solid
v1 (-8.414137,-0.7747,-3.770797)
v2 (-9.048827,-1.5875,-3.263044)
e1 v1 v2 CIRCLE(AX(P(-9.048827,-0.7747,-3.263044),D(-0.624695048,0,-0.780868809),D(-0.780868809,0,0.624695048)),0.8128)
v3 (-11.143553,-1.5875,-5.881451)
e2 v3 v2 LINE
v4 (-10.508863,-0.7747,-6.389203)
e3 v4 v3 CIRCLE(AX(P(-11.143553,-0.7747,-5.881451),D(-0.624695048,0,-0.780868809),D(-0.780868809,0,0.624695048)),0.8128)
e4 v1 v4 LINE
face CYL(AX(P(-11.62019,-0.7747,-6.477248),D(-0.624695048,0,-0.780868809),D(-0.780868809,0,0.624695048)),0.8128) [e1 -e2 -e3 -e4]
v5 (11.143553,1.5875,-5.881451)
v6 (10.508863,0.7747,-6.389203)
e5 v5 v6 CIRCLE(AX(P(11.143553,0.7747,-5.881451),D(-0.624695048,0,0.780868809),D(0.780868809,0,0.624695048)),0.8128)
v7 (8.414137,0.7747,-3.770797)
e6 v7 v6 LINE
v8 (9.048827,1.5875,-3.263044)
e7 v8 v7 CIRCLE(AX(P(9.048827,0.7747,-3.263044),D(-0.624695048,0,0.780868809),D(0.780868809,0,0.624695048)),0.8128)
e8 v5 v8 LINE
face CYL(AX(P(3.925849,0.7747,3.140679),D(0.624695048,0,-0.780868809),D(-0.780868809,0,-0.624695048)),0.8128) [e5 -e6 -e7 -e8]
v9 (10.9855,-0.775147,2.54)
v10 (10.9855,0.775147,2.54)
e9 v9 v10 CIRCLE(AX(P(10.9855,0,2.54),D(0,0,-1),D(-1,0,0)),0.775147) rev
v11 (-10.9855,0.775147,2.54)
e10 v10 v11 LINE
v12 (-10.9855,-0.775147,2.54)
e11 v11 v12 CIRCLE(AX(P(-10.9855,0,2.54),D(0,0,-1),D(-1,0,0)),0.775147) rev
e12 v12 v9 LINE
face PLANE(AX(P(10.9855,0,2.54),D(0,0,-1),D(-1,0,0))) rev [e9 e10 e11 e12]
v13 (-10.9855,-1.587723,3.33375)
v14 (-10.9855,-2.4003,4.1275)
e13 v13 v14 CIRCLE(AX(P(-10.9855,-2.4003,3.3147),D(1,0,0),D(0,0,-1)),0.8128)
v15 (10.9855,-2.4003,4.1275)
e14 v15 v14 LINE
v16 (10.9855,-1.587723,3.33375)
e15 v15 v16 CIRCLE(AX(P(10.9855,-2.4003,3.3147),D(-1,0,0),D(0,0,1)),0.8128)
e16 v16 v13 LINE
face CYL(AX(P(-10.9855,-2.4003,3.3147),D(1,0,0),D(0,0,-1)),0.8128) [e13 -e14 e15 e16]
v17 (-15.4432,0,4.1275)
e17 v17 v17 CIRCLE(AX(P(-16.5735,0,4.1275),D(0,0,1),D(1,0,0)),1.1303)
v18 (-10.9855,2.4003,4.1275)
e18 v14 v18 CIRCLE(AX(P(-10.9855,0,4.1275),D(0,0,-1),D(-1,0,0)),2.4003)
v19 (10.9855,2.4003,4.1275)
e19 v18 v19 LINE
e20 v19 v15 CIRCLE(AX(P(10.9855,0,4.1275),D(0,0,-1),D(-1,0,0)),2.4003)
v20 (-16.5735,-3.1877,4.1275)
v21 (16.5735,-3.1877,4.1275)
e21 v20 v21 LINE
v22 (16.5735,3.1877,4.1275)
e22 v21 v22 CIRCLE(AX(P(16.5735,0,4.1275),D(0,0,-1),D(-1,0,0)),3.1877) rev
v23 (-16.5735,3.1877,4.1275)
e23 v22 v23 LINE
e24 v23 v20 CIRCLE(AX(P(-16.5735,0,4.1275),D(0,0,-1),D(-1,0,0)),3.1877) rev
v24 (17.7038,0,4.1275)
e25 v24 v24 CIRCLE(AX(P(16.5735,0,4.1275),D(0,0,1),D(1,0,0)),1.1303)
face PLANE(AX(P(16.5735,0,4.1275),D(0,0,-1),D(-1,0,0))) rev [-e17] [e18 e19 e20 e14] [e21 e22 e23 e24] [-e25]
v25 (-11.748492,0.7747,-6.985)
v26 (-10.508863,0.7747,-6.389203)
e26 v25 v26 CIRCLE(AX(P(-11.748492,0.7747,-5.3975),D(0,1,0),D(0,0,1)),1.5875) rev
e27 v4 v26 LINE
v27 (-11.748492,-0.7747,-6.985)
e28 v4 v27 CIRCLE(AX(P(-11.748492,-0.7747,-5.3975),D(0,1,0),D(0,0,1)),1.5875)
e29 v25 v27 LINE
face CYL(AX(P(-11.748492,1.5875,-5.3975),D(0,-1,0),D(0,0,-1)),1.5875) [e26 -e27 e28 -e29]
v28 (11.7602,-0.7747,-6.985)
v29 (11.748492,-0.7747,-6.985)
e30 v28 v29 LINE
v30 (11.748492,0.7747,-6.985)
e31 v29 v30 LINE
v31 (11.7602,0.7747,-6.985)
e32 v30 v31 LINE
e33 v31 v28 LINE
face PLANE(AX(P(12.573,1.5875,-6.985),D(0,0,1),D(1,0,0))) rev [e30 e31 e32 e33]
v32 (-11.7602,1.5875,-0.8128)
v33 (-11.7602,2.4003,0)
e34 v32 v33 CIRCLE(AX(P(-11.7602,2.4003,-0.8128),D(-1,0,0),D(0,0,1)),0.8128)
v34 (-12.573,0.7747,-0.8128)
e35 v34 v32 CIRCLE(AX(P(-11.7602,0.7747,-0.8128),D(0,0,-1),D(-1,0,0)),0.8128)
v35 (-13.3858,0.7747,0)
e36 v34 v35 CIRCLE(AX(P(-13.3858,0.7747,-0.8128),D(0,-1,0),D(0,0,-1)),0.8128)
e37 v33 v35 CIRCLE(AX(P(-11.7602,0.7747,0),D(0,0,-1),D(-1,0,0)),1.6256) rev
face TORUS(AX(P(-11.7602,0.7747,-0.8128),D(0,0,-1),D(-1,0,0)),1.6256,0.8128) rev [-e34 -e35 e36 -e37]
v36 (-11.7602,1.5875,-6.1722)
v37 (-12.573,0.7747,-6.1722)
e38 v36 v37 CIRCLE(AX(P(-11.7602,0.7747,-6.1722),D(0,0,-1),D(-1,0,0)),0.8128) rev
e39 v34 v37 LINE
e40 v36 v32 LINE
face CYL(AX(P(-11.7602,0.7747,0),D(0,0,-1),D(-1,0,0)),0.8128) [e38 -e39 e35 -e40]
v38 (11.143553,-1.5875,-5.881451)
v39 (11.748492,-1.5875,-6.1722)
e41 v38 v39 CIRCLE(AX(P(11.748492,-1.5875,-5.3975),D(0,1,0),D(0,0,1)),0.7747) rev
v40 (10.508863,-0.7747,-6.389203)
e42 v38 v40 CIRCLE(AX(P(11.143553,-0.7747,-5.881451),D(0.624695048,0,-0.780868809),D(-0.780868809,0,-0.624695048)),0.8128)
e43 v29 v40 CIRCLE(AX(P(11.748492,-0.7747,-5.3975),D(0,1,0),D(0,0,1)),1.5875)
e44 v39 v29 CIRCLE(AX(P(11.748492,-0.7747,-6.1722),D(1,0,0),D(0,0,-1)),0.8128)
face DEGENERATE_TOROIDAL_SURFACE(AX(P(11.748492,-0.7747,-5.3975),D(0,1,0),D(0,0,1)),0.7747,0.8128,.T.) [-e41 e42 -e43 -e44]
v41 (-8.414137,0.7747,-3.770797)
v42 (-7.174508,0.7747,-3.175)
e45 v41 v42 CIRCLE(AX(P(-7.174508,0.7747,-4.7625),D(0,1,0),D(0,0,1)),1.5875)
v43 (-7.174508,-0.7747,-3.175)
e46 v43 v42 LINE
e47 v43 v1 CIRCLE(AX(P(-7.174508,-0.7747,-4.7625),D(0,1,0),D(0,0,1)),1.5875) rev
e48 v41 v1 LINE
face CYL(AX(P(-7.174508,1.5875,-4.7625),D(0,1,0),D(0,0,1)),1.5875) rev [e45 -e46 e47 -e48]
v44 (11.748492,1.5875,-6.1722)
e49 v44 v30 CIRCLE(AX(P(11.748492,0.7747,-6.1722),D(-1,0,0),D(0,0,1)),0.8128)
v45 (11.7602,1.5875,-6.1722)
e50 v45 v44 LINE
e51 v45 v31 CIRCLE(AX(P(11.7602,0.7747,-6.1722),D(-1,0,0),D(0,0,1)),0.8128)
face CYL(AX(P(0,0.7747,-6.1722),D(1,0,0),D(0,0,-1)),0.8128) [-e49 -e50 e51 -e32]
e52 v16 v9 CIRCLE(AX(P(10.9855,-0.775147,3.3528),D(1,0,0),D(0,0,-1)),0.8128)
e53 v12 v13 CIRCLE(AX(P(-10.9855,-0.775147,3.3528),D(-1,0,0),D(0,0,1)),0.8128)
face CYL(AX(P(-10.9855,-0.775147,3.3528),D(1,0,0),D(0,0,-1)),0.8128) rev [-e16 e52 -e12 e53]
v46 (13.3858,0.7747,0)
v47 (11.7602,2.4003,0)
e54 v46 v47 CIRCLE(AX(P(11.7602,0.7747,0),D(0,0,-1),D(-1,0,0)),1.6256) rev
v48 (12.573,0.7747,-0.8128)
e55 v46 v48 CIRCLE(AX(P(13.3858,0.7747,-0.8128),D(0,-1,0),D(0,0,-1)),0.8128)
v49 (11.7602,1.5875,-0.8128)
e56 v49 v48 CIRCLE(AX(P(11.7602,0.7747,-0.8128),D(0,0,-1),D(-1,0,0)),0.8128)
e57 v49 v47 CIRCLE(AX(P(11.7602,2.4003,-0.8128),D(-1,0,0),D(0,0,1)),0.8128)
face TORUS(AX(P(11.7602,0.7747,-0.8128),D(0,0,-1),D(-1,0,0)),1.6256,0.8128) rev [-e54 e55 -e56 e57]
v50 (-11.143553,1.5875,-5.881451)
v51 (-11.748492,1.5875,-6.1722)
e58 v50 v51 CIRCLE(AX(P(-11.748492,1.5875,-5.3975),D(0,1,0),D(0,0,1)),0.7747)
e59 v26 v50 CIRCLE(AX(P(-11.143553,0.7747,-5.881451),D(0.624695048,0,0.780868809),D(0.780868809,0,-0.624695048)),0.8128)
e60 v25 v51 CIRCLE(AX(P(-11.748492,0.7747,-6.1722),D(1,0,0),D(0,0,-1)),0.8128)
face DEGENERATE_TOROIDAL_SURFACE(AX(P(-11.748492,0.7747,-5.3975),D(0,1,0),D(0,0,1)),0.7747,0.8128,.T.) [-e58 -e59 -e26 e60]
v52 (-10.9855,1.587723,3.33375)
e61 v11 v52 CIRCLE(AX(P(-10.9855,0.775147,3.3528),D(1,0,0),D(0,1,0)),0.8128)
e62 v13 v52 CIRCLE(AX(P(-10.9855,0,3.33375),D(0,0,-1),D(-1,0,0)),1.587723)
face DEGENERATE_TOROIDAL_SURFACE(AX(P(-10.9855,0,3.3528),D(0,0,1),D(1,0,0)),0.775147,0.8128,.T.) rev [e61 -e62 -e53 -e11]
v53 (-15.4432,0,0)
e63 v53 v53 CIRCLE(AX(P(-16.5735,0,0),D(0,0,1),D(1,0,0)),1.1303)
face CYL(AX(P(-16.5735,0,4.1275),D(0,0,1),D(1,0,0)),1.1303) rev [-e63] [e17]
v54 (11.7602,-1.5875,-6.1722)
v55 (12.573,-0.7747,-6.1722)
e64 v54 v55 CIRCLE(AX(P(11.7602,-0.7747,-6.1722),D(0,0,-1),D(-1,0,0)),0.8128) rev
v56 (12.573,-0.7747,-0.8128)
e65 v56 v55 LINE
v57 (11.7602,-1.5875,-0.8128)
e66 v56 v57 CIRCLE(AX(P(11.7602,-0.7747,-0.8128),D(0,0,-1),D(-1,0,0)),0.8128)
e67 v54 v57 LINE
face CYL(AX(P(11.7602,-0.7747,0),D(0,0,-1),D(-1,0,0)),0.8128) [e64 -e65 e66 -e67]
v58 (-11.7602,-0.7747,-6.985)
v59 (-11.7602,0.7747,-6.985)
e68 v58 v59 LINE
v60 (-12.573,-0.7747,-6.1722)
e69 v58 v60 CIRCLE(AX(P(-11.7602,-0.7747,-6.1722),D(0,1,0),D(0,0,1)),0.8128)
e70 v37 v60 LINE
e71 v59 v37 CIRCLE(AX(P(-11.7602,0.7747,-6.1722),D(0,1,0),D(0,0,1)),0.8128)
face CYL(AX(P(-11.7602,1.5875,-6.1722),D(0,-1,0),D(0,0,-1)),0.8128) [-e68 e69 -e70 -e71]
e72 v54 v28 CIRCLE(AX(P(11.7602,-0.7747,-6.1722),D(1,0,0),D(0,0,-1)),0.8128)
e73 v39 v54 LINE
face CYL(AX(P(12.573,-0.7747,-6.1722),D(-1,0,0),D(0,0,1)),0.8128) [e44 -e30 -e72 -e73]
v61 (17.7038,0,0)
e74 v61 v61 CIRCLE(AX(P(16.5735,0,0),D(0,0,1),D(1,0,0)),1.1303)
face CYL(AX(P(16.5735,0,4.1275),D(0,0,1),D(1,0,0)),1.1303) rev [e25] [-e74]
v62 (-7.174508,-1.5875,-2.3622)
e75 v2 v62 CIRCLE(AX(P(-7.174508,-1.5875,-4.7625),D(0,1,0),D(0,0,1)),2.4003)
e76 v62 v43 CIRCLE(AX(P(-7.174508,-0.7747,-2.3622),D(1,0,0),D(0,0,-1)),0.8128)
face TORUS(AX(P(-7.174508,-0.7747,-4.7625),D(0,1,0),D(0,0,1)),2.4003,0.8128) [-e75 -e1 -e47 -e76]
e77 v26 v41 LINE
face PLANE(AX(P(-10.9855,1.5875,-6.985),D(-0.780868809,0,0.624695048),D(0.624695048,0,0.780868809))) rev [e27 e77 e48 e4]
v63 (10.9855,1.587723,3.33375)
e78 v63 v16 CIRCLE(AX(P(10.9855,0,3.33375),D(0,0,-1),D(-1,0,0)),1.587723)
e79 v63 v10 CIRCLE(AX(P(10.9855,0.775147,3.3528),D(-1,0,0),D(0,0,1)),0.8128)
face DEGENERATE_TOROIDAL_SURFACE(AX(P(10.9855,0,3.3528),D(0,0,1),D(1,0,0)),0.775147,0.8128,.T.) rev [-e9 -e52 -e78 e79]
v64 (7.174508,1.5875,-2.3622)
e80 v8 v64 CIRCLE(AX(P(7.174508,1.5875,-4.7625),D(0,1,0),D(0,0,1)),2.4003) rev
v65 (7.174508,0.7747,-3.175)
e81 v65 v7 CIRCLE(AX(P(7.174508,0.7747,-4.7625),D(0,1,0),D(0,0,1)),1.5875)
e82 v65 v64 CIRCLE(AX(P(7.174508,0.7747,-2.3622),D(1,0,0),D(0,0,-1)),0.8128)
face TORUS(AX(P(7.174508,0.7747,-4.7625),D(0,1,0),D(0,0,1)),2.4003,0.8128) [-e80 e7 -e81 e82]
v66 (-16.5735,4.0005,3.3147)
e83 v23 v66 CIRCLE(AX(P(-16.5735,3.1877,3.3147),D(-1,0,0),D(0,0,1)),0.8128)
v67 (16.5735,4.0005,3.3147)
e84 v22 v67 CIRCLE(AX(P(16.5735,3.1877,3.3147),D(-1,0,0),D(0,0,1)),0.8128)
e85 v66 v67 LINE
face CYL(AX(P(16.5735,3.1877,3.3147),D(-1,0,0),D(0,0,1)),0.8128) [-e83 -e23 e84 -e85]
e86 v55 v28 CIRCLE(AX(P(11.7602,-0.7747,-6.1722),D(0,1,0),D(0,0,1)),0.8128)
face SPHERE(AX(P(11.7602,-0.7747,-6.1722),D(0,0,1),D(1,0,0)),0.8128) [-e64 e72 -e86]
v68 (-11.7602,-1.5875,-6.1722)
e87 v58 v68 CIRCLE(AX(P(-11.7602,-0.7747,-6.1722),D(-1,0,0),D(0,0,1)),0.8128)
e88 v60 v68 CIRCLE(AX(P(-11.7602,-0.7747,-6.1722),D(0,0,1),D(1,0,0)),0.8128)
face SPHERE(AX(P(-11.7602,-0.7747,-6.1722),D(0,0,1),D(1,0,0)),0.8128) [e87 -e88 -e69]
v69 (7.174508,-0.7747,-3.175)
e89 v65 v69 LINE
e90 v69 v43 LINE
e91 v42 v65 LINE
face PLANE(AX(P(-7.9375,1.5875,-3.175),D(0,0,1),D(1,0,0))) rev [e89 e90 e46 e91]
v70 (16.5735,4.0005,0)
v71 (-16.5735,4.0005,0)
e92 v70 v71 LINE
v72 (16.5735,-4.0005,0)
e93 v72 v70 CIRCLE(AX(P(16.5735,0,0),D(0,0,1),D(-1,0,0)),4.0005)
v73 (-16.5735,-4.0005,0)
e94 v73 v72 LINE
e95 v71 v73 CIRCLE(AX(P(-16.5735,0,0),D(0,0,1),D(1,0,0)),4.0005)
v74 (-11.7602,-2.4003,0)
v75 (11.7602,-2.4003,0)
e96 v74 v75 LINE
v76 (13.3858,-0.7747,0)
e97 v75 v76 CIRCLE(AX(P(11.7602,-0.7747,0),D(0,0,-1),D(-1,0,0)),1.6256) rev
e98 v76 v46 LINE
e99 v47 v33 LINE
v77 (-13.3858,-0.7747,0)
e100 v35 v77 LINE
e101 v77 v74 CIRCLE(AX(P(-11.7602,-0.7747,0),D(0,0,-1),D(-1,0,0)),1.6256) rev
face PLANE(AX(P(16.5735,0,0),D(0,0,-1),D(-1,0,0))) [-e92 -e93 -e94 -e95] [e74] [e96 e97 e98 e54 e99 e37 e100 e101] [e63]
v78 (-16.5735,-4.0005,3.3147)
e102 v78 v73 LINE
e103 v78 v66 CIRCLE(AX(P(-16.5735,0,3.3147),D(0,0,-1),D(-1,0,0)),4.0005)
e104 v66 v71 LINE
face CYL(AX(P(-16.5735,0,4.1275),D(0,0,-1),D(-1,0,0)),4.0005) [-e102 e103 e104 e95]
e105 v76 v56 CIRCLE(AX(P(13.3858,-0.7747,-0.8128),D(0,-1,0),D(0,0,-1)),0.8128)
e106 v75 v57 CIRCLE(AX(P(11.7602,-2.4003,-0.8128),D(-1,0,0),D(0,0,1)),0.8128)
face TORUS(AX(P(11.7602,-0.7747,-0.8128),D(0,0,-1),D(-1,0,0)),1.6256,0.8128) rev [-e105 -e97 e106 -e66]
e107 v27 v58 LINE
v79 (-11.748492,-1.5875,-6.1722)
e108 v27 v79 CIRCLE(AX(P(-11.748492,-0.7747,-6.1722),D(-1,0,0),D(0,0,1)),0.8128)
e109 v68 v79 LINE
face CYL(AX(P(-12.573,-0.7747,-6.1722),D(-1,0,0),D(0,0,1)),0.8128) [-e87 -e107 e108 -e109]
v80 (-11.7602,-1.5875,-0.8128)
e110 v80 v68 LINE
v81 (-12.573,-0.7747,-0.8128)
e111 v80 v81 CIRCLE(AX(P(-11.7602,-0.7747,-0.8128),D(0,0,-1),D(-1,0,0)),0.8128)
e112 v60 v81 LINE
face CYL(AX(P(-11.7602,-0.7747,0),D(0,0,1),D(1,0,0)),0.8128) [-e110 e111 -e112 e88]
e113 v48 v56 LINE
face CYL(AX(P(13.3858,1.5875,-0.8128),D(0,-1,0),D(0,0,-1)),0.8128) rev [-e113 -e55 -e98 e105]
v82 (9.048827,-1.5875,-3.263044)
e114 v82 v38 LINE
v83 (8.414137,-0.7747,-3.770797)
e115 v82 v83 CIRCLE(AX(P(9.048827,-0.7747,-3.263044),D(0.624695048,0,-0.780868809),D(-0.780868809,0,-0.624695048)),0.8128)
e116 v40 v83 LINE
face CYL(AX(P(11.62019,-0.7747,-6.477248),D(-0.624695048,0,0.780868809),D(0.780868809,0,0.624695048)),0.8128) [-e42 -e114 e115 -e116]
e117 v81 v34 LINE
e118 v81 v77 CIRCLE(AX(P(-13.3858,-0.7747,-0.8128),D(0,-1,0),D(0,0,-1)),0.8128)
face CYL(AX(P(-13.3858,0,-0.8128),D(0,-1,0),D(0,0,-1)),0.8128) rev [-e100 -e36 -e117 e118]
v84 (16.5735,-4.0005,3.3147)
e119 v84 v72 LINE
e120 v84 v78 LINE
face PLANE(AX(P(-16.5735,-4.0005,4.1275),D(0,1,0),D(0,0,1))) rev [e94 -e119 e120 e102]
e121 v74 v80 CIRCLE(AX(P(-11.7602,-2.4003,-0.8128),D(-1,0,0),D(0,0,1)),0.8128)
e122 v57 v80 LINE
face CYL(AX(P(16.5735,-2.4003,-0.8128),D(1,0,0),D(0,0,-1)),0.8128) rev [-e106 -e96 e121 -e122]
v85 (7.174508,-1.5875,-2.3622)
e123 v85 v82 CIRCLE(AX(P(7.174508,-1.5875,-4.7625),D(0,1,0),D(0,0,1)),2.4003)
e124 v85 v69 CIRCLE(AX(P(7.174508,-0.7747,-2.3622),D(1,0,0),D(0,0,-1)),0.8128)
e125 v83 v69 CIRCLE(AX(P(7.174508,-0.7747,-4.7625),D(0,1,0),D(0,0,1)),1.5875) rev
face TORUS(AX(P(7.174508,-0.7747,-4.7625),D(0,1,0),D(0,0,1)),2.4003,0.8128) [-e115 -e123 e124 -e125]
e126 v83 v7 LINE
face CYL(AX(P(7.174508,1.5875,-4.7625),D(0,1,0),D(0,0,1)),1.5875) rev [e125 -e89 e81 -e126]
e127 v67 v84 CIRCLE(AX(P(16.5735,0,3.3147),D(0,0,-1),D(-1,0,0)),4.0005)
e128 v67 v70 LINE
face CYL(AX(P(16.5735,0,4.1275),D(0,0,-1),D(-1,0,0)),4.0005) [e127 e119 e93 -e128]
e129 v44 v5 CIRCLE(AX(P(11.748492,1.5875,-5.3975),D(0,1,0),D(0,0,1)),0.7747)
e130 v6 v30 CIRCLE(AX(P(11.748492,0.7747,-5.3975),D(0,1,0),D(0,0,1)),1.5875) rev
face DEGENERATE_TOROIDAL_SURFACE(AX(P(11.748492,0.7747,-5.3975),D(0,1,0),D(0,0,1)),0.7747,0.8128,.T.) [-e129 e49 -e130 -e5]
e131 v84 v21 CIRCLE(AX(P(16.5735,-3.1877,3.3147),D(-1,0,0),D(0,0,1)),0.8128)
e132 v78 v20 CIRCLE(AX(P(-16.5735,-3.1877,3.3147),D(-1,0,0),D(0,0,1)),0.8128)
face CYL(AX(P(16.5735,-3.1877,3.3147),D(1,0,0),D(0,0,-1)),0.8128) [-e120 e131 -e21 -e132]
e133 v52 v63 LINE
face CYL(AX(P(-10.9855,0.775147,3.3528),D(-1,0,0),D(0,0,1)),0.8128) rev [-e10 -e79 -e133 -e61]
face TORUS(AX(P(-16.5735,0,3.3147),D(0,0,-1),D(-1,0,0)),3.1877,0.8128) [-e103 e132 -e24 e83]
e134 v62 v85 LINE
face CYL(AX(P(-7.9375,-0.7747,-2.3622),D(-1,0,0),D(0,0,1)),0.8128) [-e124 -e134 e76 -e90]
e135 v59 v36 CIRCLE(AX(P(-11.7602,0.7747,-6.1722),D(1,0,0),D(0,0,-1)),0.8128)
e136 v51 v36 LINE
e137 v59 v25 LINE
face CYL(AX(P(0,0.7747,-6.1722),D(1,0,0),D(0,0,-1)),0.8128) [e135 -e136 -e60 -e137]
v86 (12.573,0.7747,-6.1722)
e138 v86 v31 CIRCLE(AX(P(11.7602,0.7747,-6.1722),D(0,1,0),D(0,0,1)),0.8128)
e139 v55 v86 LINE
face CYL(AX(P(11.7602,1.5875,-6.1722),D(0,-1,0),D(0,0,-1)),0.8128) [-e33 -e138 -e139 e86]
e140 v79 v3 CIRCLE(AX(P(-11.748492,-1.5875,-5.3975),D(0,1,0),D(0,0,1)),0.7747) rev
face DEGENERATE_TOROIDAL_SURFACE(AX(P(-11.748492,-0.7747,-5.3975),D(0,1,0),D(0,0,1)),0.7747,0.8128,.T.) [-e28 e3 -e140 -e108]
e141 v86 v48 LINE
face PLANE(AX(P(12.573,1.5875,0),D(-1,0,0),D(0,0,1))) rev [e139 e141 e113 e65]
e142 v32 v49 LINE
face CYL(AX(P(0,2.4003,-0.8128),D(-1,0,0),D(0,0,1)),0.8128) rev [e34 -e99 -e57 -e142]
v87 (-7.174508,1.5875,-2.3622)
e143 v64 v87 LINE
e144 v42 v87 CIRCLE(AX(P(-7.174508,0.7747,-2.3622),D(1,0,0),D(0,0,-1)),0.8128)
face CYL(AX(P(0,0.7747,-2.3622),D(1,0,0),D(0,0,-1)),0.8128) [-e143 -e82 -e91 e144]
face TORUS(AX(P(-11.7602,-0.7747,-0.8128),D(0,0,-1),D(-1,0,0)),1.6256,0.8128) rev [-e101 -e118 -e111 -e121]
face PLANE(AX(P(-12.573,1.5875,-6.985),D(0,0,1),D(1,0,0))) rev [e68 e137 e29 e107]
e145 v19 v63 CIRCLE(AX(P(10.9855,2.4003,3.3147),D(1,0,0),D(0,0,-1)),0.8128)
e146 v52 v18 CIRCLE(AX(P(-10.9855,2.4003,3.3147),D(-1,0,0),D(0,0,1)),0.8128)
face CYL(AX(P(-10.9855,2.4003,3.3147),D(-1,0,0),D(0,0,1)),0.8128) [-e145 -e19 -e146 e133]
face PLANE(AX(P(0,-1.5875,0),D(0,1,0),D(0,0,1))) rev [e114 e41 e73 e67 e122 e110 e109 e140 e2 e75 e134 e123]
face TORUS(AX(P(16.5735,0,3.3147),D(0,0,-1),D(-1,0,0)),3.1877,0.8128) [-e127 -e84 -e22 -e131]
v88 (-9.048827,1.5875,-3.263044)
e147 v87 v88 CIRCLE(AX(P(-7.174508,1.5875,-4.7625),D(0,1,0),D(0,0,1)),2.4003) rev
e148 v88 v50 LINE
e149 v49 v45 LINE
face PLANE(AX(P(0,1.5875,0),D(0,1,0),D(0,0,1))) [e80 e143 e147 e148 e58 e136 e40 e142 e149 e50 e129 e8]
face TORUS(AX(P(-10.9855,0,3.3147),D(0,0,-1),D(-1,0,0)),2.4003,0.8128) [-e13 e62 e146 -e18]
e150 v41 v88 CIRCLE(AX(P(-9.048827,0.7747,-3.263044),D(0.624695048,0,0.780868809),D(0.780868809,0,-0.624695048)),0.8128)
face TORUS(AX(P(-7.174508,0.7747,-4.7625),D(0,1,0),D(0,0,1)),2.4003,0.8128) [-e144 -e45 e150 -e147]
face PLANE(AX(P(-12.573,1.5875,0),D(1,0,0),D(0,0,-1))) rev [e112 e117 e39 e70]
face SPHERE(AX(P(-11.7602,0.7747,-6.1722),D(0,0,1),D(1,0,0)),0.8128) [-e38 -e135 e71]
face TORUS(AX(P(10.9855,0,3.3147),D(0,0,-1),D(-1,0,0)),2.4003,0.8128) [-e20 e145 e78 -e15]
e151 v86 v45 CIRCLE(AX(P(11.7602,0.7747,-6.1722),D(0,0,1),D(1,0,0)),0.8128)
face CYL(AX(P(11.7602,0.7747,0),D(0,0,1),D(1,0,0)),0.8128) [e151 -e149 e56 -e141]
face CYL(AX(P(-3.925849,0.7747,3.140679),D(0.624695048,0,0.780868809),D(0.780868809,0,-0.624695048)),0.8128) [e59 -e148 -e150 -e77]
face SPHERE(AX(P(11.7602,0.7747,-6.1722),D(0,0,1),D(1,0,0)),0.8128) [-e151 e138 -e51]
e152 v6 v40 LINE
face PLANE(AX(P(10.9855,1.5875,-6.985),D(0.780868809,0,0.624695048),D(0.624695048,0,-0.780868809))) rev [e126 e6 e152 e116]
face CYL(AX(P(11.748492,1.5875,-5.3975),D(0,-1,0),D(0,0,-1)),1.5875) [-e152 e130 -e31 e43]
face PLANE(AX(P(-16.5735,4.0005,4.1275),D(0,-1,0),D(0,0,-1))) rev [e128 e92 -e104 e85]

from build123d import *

# Parameters (mm, degrees)
BOSS_EXTRUDE1_DEPTH   = 4.1275
CUT_EXTRUDE1_DEPTH    = 1.5875
F_4_40_TAPPED_HOLE1_D = 2.2606
BOSS_EXTRUDE2_DEPTH   = 1.5875
FILLET1_R             = 1.5875
FILLET2_R             = 0.8128
FILLET3_R             = 0.8128
FILLET4_R             = 0.8128


with BuildPart() as part:
    # Sketch1 → Boss-Extrude1 (new body)
    with BuildSketch(Plane.XY):
        with BuildLine():
            Line((-16.5735, 4.0005), (16.5735, 4.0005))
            ThreePointArc((16.5735, 4.0005), (20.574, 0), (16.5735, -4.0005))
            Line((16.5735, -4.0005), (-16.5735, -4.0005))
            ThreePointArc((-16.5735, -4.0005), (-20.574, 0), (-16.5735, 4.0005))
        make_face()
    extrude(amount=BOSS_EXTRUDE1_DEPTH)

    # Sketch2 → Cut-Extrude1 (cut)
    with BuildSketch(Plane.XY.offset(4.1275)):
        with BuildLine():
            Line((-10.9855, 1.5875), (10.9855, 1.5875))
            ThreePointArc((10.9855, 1.5875), (12.573, 0), (10.9855, -1.5875))
            Line((10.9855, -1.5875), (-10.9855, -1.5875))
            ThreePointArc((-10.9855, -1.5875), (-12.573, 0), (-10.9855, 1.5875))
        make_face()
    extrude(amount=-CUT_EXTRUDE1_DEPTH, mode=Mode.SUBTRACT)

    # #4-40 Tapped Hole1 (through all)
    with Locations(Plane.XY.offset(4.1275)):
        with Locations((-16.5735, 0), (16.5735, 0)):
            Hole(F_4_40_TAPPED_HOLE1_D / 2)

    # Sketch5 → Boss-Extrude2 (add, symmetric)
    with BuildSketch(Plane(origin=(0, 0, 0), x_dir=(1, 0, 0), z_dir=(0, 1, 0))):
        Polygon((-12.573, 0), (-12.573, 6.985), (-10.9855, 6.985), (-7.9375, 3.175), (7.9375, 3.175), (10.9855, 6.985), (12.573, 6.985), (12.573, 0), align=None)
    extrude(amount=BOSS_EXTRUDE2_DEPTH, both=True)

    # Fillet1
    fillet1_edges = [part.edges().sort_by_distance(p)[0] for p in [
        (10.9855, 0, -6.985),
        (7.9375, 0, -3.175),
        (-7.9375, 0, -3.175),
        (-10.9855, 0, -6.985),
    ]]
    fillet(fillet1_edges, radius=FILLET1_R)

    # Fillet2
    fillet2_edges = [part.edges().sort_by_distance(p)[0] for p in [
        (12.573, -1.5875, -3.4925),
        (-12.573, -1.5875, -3.4925),
        (12.573, 1.5875, -3.4925),
        (-12.573, 1.5875, -3.4925),
    ]]
    fillet(fillet2_edges, radius=FILLET2_R)

    # Fillet3
    fillet3_edges = [part.edges().sort_by_distance(p)[0] for p in [
        (12.573, 0, 0),
        (11.754345973, -1.5875, -6.985),
        (11.754345973, 1.5875, -6.985),
        (12.334936392, 1.349436392, -6.985),
        (12.334936392, -1.349436392, -6.985),
        (0, -1.5875, 0),
        (0, 1.5875, 0),
        (-12.573, 0, 0),
        (-12.573, 0, -6.985),
        (-12.334936392, 1.349436392, -6.985),
        (-12.334936392, -1.349436392, -6.985),
        (12.334936392, -1.349436392, 0),
        (12.334936392, 1.349436392, 0),
        (-12.334936392, -1.349436392, 0),
        (-12.334936392, 1.349436392, 0),
        (-20.574, 0, 4.1275),
        (0, -4.0005, 4.1275),
        (12.573, 0, 4.1275),
        (0, 1.5875, 4.1275),
        (-12.573, 0, 4.1275),
        (0, -1.5875, 4.1275),
        (20.574, 0, 4.1275),
        (-11.754345973, -1.5875, -6.985),
        (-11.754345973, 1.5875, -6.985),
        (-9.4615, -1.5875, -5.08),
        (0, -1.5875, -3.175),
        (9.4615, -1.5875, -5.08),
        (11.060804836, -1.5875, -6.828318888),
        (-11.060804836, -1.5875, -6.828318888),
        (-9.4615, 1.5875, -5.08),
        (9.4615, 1.5875, -5.08),
        (0, 1.5875, -3.175),
        (11.060804836, 1.5875, -6.828318888),
        (-11.060804836, 1.5875, -6.828318888),
        (7.862195164, -1.5875, -3.331681112),
        (7.862195164, 1.5875, -3.331681112),
        (-7.862195164, -1.5875, -3.331681112),
        (-7.862195164, 1.5875, -3.331681112),
        (0, 4.0005, 4.1275),
        (12.573, 0, -6.985),
    ]]
    fillet(fillet3_edges, radius=FILLET3_R)

    # Fillet4
    # the kernel refuses this fillet: 0.8128 mm, written as the material it adds along each edge
    with BuildSketch(Plane(origin=(10.9855, -1.5875, 2.54), x_dir=(0, -0.00028128862329323027, 0.9999999604383545), z_dir=(-1, 0, 0)), Plane(origin=(-10.9855, 1.5875, 2.54), x_dir=(0, 0.00028128862329323027, 0.9999999604383545), z_dir=(1, 0, 0))) as fillet4_piece_1:
        with BuildLine():
            CenterArc((0.812571462, 0.812582054), FILLET4_R, 180.016116651, 88.657007194)
            Line((-0.000228506, 0.812353422), (-0.081508503, 0.812330559))
            Line((-0.081508503, 0.812330559), (-0.081279997, -2.2863e-05))
            Line((-0.081279997, -2.2863e-05), (2.2863e-05, -0.081279997))
            ThreePointArc((2.2863e-05, -0.081279997), (0.774722832, -0.081062082), (0.791867888, -0.081258205))
            Line((0.791867888, -0.081258205), (0.793750031, 0))
        make_face()
    extrude(amount=21.971)
    with BuildSketch(Plane(origin=(-10.9855, 0, 2.54), x_dir=(0, -1, 0), z_dir=(1, 0, 0))) as fillet4_piece_2:
        with BuildLine():
            CenterArc((0.775146546, -0.8128), FILLET4_R, 1.342992806, 88.657007194)
            Line((0.775146546, 0), (0.775146546, 0.08128))
            Line((0.775146546, 0.08128), (1.5875, 0.08128))
            Line((1.5875, 0.08128), (1.66878, 0))
            ThreePointArc((1.66878, 0), (1.66878, -0.7747), (1.668980946, -0.791845))
            Line((1.668980946, -0.791845), (1.587723273, -0.79375))
        make_face()
    revolve(axis=Axis((-10.9855, 0, 2.54), (0, 0, -1)), revolution_arc=180)
    with BuildSketch(Plane(origin=(10.9855, 0, 2.54), x_dir=(0, 1, 0), z_dir=(-1, 0, 0))) as fillet4_piece_3:
        with BuildLine():
            CenterArc((0.775146546, -0.8128), FILLET4_R, 1.342992806, 88.657007194)
            Line((0.775146546, 0), (0.775146546, 0.08128))
            Line((0.775146546, 0.08128), (1.5875, 0.08128))
            Line((1.5875, 0.08128), (1.66878, 0))
            ThreePointArc((1.66878, 0), (1.66878, -0.7747), (1.668980946, -0.791845))
            Line((1.668980946, -0.791845), (1.587723273, -0.79375))
        make_face()
    revolve(axis=Axis((10.9855, 0, 2.54), (0, 0, -1)), revolution_arc=180)


solid = part.part
